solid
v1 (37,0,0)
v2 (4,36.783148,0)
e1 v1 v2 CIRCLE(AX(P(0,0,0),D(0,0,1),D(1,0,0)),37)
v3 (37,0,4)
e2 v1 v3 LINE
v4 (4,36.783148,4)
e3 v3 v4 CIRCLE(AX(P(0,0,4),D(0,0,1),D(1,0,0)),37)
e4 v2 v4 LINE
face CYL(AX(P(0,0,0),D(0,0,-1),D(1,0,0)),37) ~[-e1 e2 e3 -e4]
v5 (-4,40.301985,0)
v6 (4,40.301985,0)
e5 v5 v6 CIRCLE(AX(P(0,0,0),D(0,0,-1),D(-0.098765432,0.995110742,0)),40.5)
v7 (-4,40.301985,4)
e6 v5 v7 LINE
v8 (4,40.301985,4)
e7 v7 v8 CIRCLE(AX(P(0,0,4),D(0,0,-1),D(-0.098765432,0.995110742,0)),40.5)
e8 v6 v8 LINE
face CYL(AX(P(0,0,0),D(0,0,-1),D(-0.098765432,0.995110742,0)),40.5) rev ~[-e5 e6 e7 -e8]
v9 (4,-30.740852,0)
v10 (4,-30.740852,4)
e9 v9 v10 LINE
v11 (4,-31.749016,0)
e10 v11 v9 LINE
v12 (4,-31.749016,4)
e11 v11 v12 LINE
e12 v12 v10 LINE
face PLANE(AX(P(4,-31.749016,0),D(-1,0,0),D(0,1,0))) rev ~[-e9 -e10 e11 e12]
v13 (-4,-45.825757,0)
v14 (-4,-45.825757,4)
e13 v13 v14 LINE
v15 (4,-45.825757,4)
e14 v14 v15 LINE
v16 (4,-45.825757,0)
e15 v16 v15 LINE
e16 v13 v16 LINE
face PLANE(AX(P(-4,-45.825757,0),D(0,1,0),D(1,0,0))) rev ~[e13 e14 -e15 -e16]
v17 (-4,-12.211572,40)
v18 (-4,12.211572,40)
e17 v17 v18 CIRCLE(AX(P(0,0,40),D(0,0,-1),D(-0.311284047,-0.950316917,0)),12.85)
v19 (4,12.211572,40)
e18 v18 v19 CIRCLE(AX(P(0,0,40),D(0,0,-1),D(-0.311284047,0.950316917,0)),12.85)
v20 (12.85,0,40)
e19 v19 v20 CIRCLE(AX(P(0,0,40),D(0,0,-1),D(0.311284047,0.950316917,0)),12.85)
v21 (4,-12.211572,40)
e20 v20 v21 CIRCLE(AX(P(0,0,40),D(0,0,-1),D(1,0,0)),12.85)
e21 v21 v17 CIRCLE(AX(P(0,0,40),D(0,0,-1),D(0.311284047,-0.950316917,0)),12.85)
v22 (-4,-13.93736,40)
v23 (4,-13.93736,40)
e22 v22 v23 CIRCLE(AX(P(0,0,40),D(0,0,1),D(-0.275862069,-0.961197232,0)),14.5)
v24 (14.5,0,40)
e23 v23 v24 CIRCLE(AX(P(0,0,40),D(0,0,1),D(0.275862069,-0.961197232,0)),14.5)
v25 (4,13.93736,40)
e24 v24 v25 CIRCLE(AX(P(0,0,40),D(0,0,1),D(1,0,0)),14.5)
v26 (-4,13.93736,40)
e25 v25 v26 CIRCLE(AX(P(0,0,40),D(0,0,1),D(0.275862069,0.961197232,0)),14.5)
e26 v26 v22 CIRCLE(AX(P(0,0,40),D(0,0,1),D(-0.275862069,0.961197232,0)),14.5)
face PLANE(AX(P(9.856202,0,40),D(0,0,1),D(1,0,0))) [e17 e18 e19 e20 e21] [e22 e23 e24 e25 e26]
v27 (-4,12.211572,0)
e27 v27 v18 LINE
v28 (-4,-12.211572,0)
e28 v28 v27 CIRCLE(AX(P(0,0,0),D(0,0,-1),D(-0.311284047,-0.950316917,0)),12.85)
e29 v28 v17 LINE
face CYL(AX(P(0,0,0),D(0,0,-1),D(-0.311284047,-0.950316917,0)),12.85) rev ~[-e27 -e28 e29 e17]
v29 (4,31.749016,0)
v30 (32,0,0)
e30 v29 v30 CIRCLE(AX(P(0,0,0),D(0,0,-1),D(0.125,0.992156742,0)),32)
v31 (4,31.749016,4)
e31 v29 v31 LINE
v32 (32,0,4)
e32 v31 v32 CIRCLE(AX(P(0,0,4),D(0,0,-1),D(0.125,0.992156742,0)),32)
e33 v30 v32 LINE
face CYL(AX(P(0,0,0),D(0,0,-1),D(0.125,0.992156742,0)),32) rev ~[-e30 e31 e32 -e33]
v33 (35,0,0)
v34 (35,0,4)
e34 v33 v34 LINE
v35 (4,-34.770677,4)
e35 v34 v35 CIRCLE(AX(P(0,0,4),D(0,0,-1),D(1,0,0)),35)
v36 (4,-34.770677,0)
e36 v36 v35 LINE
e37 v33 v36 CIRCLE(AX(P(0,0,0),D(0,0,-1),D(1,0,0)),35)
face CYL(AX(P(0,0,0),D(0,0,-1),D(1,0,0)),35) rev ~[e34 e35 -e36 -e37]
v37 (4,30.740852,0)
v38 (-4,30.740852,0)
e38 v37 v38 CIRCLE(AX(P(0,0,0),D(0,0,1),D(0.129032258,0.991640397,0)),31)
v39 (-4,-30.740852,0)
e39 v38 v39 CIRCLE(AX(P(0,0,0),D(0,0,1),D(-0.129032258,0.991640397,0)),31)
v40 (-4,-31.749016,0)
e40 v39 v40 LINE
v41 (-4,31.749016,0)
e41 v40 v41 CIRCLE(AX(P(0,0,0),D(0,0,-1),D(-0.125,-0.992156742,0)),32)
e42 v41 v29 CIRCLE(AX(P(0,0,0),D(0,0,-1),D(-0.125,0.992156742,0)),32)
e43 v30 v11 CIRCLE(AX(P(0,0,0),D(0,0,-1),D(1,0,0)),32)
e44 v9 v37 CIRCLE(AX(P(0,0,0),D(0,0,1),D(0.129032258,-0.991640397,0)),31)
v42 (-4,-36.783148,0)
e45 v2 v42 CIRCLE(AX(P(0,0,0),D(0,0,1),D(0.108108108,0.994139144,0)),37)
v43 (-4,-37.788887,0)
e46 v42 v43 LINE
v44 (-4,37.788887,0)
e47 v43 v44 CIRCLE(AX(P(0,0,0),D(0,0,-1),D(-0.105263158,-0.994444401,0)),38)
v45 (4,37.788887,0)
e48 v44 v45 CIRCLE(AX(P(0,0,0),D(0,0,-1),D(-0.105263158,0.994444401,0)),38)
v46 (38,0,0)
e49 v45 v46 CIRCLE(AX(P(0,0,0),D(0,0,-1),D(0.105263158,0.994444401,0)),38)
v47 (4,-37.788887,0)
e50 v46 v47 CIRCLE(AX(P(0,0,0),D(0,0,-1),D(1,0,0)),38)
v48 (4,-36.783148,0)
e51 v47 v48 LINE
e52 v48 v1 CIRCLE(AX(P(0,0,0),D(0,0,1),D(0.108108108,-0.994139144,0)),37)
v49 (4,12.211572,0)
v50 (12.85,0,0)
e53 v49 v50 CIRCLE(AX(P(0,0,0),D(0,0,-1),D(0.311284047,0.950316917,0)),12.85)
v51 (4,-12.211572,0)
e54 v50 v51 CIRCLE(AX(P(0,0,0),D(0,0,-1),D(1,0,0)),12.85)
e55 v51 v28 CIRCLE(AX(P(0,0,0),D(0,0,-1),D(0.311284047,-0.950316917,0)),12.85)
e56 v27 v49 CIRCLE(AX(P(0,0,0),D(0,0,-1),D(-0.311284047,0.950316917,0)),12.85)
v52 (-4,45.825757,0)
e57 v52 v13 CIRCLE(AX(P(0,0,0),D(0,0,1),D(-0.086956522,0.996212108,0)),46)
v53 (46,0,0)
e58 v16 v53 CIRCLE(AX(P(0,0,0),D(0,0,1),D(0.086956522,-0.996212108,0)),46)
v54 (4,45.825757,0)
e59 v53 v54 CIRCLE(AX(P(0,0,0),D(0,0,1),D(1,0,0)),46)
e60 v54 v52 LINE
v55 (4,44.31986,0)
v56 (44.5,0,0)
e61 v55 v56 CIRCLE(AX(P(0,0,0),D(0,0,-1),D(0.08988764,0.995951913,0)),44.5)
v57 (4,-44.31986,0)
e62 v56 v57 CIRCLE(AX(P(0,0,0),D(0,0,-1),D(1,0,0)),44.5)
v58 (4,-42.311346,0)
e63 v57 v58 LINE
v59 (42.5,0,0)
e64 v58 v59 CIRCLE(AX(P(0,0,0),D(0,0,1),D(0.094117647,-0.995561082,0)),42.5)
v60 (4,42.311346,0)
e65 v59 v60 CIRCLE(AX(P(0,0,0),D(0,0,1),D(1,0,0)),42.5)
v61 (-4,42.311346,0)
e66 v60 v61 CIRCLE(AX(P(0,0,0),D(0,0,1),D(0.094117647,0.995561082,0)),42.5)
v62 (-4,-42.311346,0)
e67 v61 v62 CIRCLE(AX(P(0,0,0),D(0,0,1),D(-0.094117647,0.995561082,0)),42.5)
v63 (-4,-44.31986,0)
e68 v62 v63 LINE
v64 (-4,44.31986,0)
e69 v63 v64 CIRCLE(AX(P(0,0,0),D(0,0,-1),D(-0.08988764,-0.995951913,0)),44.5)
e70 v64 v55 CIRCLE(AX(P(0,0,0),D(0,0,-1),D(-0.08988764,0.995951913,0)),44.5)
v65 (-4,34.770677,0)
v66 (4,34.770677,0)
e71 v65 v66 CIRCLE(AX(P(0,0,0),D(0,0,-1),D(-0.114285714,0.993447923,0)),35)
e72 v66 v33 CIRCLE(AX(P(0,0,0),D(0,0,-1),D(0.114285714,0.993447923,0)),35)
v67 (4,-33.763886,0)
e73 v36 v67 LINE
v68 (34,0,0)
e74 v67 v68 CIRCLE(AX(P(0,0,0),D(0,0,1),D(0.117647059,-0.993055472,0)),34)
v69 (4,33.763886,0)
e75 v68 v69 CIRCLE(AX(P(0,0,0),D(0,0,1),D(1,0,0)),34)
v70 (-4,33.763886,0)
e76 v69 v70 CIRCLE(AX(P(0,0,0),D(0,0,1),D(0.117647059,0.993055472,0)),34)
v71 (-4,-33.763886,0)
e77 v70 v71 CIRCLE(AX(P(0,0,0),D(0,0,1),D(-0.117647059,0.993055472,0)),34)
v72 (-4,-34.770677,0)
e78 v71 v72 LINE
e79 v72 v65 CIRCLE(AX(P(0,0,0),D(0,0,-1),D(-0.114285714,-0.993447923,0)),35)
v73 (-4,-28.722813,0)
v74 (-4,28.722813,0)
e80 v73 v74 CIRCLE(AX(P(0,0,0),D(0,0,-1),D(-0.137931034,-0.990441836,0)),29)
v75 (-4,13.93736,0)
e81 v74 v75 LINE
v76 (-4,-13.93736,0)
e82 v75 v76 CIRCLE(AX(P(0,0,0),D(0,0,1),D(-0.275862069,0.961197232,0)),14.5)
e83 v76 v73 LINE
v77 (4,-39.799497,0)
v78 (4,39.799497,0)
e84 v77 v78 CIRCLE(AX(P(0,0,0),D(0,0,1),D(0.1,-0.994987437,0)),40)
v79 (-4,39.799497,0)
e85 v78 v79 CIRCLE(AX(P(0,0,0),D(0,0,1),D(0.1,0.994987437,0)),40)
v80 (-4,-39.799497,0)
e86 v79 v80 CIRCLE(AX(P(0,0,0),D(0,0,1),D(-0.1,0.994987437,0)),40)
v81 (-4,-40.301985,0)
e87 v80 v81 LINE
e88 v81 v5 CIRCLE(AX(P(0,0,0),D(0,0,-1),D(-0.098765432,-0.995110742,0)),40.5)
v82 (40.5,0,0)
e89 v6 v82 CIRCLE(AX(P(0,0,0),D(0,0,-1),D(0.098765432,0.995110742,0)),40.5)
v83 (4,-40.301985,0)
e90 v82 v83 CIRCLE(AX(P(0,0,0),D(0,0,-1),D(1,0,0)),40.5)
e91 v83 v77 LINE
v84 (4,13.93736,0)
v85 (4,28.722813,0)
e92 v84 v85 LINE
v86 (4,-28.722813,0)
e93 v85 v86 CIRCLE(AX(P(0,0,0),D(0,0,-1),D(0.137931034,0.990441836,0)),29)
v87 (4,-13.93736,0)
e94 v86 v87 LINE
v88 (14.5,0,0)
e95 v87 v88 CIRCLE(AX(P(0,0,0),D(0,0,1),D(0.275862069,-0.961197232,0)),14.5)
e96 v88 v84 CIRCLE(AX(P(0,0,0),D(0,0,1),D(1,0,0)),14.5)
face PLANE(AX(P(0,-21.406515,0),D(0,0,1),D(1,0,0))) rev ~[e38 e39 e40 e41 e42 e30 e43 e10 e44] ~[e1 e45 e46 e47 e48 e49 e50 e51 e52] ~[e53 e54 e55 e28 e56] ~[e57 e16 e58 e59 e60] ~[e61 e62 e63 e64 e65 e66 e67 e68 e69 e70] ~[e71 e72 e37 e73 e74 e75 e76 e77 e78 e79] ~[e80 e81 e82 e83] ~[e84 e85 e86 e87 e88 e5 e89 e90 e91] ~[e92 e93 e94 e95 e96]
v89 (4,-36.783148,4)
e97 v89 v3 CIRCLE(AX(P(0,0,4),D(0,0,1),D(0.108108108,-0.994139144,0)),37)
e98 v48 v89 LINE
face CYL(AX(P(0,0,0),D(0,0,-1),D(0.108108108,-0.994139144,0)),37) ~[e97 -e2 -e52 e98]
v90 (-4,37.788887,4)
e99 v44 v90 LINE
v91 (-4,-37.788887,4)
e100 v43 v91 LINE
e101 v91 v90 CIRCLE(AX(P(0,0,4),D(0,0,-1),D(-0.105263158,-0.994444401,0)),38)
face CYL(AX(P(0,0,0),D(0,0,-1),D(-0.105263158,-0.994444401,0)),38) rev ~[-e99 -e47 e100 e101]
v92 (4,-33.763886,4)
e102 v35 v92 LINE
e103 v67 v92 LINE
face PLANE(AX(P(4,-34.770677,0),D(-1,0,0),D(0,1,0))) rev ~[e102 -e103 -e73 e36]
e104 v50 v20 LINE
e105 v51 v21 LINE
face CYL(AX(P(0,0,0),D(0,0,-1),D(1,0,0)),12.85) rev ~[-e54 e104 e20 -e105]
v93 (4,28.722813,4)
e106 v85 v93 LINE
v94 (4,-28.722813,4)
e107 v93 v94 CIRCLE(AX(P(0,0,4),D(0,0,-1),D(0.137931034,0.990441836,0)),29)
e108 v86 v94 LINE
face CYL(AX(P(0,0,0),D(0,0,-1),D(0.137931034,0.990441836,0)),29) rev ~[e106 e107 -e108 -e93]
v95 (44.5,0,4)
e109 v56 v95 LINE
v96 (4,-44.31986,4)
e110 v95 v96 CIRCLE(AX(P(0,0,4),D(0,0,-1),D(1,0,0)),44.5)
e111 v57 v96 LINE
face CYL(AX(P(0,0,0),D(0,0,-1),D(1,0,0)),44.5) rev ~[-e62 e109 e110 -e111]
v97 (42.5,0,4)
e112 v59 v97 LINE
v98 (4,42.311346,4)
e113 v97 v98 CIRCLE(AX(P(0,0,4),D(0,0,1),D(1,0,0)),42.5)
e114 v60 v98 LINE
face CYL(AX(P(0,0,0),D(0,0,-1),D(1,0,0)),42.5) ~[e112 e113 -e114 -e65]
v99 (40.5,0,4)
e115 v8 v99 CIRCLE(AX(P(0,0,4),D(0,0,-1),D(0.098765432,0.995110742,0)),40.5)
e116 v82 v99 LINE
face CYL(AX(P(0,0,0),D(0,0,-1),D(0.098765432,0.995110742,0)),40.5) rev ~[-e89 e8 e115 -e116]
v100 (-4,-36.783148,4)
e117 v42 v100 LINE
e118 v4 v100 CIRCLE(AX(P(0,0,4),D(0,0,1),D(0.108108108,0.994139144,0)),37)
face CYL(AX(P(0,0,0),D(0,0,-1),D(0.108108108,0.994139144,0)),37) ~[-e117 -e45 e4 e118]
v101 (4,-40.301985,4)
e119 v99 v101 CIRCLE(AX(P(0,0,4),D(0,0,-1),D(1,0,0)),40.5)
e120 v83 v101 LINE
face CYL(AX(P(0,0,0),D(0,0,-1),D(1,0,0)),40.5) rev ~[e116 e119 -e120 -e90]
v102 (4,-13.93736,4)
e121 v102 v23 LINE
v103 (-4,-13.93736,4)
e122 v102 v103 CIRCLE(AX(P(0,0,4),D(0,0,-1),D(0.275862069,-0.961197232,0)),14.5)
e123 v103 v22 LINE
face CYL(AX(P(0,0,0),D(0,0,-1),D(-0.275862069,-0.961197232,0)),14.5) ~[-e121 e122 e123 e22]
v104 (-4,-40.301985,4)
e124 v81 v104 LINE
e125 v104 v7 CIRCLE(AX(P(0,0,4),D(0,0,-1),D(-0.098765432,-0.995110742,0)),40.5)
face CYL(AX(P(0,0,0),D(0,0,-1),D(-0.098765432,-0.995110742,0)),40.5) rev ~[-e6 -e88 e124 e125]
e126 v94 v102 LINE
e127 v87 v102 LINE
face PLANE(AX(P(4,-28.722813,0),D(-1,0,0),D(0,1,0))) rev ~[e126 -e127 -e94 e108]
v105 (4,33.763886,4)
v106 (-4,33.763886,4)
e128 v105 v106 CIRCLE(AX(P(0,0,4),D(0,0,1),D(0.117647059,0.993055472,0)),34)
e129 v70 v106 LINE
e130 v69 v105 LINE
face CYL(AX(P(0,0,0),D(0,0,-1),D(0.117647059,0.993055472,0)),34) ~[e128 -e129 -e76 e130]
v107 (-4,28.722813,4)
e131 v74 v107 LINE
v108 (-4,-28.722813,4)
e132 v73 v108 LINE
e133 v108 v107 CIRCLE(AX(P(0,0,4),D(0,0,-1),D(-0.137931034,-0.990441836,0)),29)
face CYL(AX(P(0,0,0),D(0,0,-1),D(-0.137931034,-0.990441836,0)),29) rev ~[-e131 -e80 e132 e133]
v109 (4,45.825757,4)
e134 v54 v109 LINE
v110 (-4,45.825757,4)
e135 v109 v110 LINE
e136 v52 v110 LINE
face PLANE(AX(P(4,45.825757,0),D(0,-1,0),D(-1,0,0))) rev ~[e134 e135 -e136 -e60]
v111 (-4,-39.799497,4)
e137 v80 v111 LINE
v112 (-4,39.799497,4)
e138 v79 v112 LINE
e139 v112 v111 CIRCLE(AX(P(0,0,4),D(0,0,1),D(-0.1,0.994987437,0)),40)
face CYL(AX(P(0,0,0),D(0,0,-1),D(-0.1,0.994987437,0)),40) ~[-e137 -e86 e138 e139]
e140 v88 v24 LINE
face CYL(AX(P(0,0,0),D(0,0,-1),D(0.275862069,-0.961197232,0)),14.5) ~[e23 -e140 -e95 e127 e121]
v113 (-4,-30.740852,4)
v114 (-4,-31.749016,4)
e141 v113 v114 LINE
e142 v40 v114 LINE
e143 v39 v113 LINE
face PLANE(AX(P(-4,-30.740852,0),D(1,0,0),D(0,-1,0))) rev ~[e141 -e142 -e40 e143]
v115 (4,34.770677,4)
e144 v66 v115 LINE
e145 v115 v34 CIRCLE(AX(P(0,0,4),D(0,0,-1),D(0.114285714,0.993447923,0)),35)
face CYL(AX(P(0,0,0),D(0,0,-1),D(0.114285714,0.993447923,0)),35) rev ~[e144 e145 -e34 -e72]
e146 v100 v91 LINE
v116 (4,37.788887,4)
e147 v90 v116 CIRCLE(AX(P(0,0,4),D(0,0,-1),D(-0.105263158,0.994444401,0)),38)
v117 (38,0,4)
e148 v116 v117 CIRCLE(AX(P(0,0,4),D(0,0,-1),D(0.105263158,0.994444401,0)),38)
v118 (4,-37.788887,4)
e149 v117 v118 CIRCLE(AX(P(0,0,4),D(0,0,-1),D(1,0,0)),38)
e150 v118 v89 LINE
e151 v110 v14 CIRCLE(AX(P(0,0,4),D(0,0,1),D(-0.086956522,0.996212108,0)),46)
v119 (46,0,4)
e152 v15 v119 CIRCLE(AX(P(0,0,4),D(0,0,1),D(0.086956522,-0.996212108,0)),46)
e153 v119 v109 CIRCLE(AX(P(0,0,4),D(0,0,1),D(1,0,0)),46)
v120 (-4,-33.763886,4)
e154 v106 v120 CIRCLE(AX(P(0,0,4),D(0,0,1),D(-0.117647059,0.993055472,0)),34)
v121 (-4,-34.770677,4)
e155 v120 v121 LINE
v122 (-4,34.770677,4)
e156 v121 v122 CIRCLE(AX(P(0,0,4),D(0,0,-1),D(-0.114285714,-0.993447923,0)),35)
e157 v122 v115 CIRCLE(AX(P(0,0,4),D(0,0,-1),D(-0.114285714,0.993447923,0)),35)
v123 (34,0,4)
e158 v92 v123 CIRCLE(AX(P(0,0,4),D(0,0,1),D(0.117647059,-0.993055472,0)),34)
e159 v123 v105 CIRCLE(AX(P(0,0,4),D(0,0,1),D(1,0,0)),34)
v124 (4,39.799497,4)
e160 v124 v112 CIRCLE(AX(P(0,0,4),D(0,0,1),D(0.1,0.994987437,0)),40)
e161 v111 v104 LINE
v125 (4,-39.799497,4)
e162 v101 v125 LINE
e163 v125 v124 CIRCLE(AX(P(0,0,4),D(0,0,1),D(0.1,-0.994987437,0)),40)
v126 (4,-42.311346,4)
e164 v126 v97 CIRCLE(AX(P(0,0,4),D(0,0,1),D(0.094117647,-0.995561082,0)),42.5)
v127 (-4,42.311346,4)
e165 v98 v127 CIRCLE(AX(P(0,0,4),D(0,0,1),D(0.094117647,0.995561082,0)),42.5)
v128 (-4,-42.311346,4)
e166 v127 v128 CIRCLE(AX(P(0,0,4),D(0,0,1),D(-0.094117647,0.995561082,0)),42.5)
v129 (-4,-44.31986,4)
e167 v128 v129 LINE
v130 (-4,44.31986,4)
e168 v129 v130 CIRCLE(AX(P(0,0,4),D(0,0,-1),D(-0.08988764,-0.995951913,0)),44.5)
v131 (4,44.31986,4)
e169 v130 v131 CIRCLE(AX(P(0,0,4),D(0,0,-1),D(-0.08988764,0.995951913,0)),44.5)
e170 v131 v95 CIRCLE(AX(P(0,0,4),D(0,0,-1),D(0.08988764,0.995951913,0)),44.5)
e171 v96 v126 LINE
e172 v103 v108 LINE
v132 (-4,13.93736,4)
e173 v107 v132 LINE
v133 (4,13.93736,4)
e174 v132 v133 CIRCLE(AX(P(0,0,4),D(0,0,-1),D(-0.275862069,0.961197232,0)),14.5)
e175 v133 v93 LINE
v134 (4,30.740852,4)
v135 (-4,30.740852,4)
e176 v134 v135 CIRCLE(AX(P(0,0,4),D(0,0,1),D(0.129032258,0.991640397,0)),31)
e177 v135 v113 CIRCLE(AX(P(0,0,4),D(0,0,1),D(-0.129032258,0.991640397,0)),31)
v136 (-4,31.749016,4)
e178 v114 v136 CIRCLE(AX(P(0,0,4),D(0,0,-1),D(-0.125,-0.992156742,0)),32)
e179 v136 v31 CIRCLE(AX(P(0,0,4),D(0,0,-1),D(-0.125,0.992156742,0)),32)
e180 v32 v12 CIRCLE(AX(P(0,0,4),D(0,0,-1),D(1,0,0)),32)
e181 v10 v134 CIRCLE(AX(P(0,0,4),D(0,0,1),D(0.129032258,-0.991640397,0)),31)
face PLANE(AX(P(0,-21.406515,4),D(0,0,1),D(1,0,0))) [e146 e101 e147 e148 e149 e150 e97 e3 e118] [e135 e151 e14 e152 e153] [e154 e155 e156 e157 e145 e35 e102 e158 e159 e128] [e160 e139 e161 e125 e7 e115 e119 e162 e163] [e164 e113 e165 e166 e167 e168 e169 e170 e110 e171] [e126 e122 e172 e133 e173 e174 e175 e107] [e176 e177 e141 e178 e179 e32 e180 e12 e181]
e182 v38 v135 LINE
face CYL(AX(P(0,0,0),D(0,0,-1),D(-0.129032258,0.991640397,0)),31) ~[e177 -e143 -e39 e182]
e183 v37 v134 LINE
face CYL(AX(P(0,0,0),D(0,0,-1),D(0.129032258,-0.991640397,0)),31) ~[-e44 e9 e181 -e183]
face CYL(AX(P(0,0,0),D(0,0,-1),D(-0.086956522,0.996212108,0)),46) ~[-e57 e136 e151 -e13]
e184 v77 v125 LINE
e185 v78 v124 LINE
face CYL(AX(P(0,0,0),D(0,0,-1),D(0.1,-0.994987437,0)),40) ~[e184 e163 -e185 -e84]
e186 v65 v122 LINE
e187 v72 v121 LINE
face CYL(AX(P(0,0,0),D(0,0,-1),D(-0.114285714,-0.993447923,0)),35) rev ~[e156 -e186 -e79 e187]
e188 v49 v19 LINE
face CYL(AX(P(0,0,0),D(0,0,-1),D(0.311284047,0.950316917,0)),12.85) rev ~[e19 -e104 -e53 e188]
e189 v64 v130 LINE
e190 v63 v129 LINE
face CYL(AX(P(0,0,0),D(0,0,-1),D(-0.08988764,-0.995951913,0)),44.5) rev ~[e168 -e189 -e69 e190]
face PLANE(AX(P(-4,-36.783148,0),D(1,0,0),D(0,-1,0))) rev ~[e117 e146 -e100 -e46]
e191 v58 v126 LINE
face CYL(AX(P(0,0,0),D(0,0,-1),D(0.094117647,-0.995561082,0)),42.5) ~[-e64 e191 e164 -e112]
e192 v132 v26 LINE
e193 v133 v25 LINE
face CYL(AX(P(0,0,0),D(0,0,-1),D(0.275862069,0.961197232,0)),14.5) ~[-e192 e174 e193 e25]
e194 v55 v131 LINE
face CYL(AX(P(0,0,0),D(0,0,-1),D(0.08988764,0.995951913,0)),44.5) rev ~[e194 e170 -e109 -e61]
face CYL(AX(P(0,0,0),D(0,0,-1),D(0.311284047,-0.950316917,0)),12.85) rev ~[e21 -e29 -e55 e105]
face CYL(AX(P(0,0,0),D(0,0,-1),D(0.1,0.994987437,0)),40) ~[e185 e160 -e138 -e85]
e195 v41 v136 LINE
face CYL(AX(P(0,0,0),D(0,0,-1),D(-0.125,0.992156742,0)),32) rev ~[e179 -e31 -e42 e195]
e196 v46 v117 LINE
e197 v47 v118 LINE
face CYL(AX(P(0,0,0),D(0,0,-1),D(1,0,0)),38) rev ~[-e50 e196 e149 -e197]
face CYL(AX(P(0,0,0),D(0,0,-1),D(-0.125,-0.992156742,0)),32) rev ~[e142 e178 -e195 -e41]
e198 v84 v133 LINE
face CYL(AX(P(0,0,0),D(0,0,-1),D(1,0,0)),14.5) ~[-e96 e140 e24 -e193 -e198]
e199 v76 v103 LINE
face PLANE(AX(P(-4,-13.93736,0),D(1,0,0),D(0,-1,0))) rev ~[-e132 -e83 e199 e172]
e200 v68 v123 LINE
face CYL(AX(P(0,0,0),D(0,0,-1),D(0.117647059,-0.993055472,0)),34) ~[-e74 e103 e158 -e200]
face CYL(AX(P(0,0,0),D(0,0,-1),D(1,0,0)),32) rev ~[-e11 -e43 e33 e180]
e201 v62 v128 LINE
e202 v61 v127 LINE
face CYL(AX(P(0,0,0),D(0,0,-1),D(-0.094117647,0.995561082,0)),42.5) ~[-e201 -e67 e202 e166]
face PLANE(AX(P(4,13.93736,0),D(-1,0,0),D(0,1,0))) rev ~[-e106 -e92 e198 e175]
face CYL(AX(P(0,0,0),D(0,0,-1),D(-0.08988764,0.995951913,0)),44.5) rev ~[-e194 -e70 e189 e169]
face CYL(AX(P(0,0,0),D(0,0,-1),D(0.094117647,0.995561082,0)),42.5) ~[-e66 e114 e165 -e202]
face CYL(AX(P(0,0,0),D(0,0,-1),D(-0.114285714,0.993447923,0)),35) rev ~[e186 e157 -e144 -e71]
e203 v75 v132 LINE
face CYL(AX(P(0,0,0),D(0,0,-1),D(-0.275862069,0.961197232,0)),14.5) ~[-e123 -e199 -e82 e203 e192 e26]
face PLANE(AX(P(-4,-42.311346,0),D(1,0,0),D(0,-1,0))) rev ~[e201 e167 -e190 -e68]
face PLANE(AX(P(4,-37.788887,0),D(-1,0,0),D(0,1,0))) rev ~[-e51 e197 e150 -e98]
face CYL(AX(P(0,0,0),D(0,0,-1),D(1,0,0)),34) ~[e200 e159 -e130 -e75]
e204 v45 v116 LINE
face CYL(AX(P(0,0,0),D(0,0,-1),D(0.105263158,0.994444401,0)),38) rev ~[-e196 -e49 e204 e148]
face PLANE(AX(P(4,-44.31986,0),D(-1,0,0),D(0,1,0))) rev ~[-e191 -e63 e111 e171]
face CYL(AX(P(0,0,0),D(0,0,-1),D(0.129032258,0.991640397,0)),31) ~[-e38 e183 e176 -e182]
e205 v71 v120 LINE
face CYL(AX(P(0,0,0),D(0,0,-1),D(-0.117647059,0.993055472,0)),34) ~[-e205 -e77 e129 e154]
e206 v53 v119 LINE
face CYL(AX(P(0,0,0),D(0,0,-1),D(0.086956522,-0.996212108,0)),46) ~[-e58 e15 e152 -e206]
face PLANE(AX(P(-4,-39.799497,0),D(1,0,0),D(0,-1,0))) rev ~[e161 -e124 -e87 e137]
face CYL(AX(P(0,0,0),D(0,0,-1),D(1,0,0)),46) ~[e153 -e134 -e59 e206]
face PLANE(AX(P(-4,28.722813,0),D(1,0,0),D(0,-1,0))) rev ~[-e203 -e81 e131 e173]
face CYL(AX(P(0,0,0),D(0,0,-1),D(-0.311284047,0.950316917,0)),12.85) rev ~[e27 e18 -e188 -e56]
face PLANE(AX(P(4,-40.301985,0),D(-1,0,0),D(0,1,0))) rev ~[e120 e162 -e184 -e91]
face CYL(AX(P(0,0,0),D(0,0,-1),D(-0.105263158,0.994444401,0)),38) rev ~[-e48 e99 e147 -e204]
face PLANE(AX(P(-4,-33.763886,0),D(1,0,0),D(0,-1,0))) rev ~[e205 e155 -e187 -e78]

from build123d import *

# Parameters (mm, degrees)
F1_DEPTH = 40
F2_DEPTH = 4


with BuildPart() as f1:
    # F0 (on Top) → F1 (new body)
    with BuildSketch(Plane.XY):
        with BuildLine():
            ThreePointArc((4, 12.2115723803), (10.4048666498, 7.5406398933), (12.85, 0))
            ThreePointArc((12.85, 0), (10.4048666498, -7.5406398933), (4, -12.2115723803))
            Line((4, -12.2115723803), (4, -13.9373598648))
            ThreePointArc((4, -13.9373598648), (11.5812348219, -8.7249641833), (14.5, 0))
            ThreePointArc((14.5, 0), (11.5812348219, 8.7249641833), (4, 13.9373598648))
            Line((4, 13.9373598648), (4, 12.2115723803))
        make_face()
        with BuildLine():
            ThreePointArc((-4, 12.2115723803), (0, 12.85), (4, 12.2115723803))
            Line((4, 12.2115723803), (4, 13.9373598648))
            ThreePointArc((4, 13.9373598648), (0, 14.5), (-4, 13.9373598648))
            Line((-4, 13.9373598648), (-4, 12.2115723803))
        make_face()
        with BuildLine():
            Line((4, -13.9373598648), (4, -12.2115723803))
            ThreePointArc((4, -12.2115723803), (0, -12.85), (-4, -12.2115723803))
            Line((-4, -12.2115723803), (-4, -13.9373598648))
            ThreePointArc((-4, -13.9373598648), (0, -14.5), (4, -13.9373598648))
        make_face()
        with BuildLine():
            ThreePointArc((-4, -12.2115723803), (-12.85, 0), (-4, 12.2115723803))
            Line((-4, 12.2115723803), (-4, 13.9373598648))
            ThreePointArc((-4, 13.9373598648), (-14.5, 0), (-4, -13.9373598648))
            Line((-4, -13.9373598648), (-4, -12.2115723803))
        make_face()
    extrude(amount=F1_DEPTH)

    # F0 (on Top) → F2 (join)
    with BuildSketch(Plane.XY):
        with BuildLine():
            Line((4, -28.7228132327), (4, -13.9373598648))
            ThreePointArc((4, -13.9373598648), (0, -14.5), (-4, -13.9373598648))
            Line((-4, -13.9373598648), (-4, -28.7228132327))
            ThreePointArc((-4, -28.7228132327), (0, -29), (4, -28.7228132327))
        make_face()
        with BuildLine():
            ThreePointArc((-4, 40.3019850628), (0, 40.5), (4, 40.3019850628))
            Line((4, 40.3019850628), (4, 42.3113459961))
            ThreePointArc((4, 42.3113459961), (0, 42.5), (-4, 42.3113459961))
            Line((-4, 42.3113459961), (-4, 40.3019850628))
        make_face()
        with BuildLine():
            ThreePointArc((-4, -40.3019850628), (-40.5, 0), (-4, 40.3019850628))
            Line((-4, 40.3019850628), (-4, 42.3113459961))
            ThreePointArc((-4, 42.3113459961), (-42.5, 0), (-4, -42.3113459961))
            Line((-4, -42.3113459961), (-4, -40.3019850628))
        make_face()
        with BuildLine():
            Line((4, -42.3113459961), (4, -40.3019850628))
            ThreePointArc((4, -40.3019850628), (0, -40.5), (-4, -40.3019850628))
            Line((-4, -40.3019850628), (-4, -42.3113459961))
            ThreePointArc((-4, -42.3113459961), (0, -42.5), (4, -42.3113459961))
        make_face()
        with BuildLine():
            Line((4, 42.3113459961), (4, 40.3019850628))
            ThreePointArc((4, 40.3019850628), (30.0187441443, 27.1868534406), (40.5, 0))
            ThreePointArc((40.5, 0), (30.0187441443, -27.1868534406), (4, -40.3019850628))
            Line((4, -40.3019850628), (4, -42.3113459961))
            ThreePointArc((4, -42.3113459961), (31.434455618, -28.6028844699), (42.5, 0))
            ThreePointArc((42.5, 0), (31.434455618, 28.6028844699), (4, 42.3113459961))
        make_face()
        with BuildLine():
            ThreePointArc((-4, 37.7888872554), (0, 38), (4, 37.7888872554))
            Line((4, 37.7888872554), (4, 39.7994974843))
            ThreePointArc((4, 39.7994974843), (0, 40), (-4, 39.7994974843))
            Line((-4, 39.7994974843), (-4, 37.7888872554))
        make_face()
        with BuildLine():
            ThreePointArc((-4, -37.7888872554), (-38, 0), (-4, 37.7888872554))
            Line((-4, 37.7888872554), (-4, 39.7994974843))
            ThreePointArc((-4, 39.7994974843), (-40, 0), (-4, -39.7994974843))
            Line((-4, -39.7994974843), (-4, -37.7888872554))
        make_face()
        with BuildLine():
            Line((4, -39.7994974843), (4, -37.7888872554))
            ThreePointArc((4, -37.7888872554), (0, -38), (-4, -37.7888872554))
            Line((-4, -37.7888872554), (-4, -39.7994974843))
            ThreePointArc((-4, -39.7994974843), (0, -40), (4, -39.7994974843))
        make_face()
        with BuildLine():
            Line((4, 39.7994974843), (4, 37.7888872554))
            ThreePointArc((4, 37.7888872554), (28.2488937837, 25.4165300543), (38, 0))
            ThreePointArc((38, 0), (28.2488937837, -25.4165300543), (4, -37.7888872554))
            Line((4, -37.7888872554), (4, -39.7994974843))
            ThreePointArc((4, -39.7994974843), (29.6647939484, -26.83281573), (40, 0))
            ThreePointArc((40, 0), (29.6647939484, 26.83281573), (4, 39.7994974843))
        make_face()
        with BuildLine():
            Line((4, -40.3019850628), (4, -39.7994974843))
            ThreePointArc((4, -39.7994974843), (0, -40), (-4, -39.7994974843))
            Line((-4, -39.7994974843), (-4, -40.3019850628))
            ThreePointArc((-4, -40.3019850628), (0, -40.5), (4, -40.3019850628))
        make_face()
        with BuildLine():
            Line((4, -44.3198601081), (4, -42.3113459961))
            ThreePointArc((4, -42.3113459961), (0, -42.5), (-4, -42.3113459961))
            Line((-4, -42.3113459961), (-4, -44.3198601081))
            ThreePointArc((-4, -44.3198601081), (0, -44.5), (4, -44.3198601081))
        make_face()
        with BuildLine():
            ThreePointArc((-4, -44.3198601081), (-44.5, 0), (-4, 44.3198601081))
            Line((-4, 44.3198601081), (-4, 45.8257569496))
            ThreePointArc((-4, 45.8257569496), (-46, 0), (-4, -45.8257569496))
            Line((-4, -45.8257569496), (-4, -44.3198601081))
        make_face()
        with BuildLine():
            Line((4, 45.8257569496), (4, 44.3198601081))
            ThreePointArc((4, 44.3198601081), (32.8500380517, 30.0187441443), (44.5, 0))
            ThreePointArc((44.5, 0), (32.8500380517, -30.0187441443), (4, -44.3198601081))
            Line((4, -44.3198601081), (4, -45.8257569496))
            ThreePointArc((4, -45.8257569496), (33.9116499156, -31.0805405358), (46, 0))
            ThreePointArc((46, 0), (33.9116499156, 31.0805405358), (4, 45.8257569496))
        make_face()
        with BuildLine():
            ThreePointArc((-4, 44.3198601081), (0, 44.5), (4, 44.3198601081))
            Line((4, 44.3198601081), (4, 45.8257569496))
            Line((4, 45.8257569496), (-4, 45.8257569496))
            Line((-4, 45.8257569496), (-4, 44.3198601081))
        make_face()
        with BuildLine():
            Line((4, -45.8257569496), (4, -44.3198601081))
            ThreePointArc((4, -44.3198601081), (0, -44.5), (-4, -44.3198601081))
            Line((-4, -44.3198601081), (-4, -45.8257569496))
            Line((-4, -45.8257569496), (4, -45.8257569496))
        make_face()
        with BuildLine():
            ThreePointArc((-4, -34.7706773014), (-35, 0), (-4, 34.7706773014))
            Line((-4, 34.7706773014), (-4, 36.7831483155))
            ThreePointArc((-4, 36.7831483155), (-37, 0), (-4, -36.7831483155))
            Line((-4, -36.7831483155), (-4, -34.7706773014))
        make_face()
        with BuildLine():
            ThreePointArc((-4, -31.7490157328), (-32, 0), (-4, 31.7490157328))
            Line((-4, 31.7490157328), (-4, 33.7638860323))
            ThreePointArc((-4, 33.7638860323), (-34, 0), (-4, -33.7638860323))
            Line((-4, -33.7638860323), (-4, -31.7490157328))
        make_face()
        with BuildLine():
            ThreePointArc((-4, -28.7228132327), (-29, 0), (-4, 28.7228132327))
            Line((-4, 28.7228132327), (-4, 30.7408522979))
            ThreePointArc((-4, 30.7408522979), (-31, 0), (-4, -30.7408522979))
            Line((-4, -30.7408522979), (-4, -28.7228132327))
        make_face()
        with BuildLine():
            Line((4, 36.7831483155), (4, 34.7706773014))
            ThreePointArc((4, 34.7706773014), (26.1247009552, 23.2916293977), (35, 0))
            ThreePointArc((35, 0), (26.1247009552, -23.2916293977), (4, -34.7706773014))
            Line((4, -34.7706773014), (4, -36.7831483155))
            ThreePointArc((4, -36.7831483155), (27.5408787078, -24.7082982012), (37, 0))
            ThreePointArc((37, 0), (27.5408787078, 24.7082982012), (4, 36.7831483155))
        make_face()
        with BuildLine():
            Line((4, 33.7638860323), (4, 31.7490157328))
            ThreePointArc((4, 31.7490157328), (24, 21.1660104885), (32, 0))
            ThreePointArc((32, 0), (24, -21.1660104885), (4, -31.7490157328))
            Line((4, -31.7490157328), (4, -33.7638860323))
            ThreePointArc((4, -33.7638860323), (25.4165300543, -22.5831795813), (34, 0))
            ThreePointArc((34, 0), (25.4165300543, 22.5831795813), (4, 33.7638860323))
        make_face()
        with BuildLine():
            Line((4, 30.7408522979), (4, 28.7228132327))
            ThreePointArc((4, 28.7228132327), (21.8746428542, 19.0394327647), (29, 0))
            ThreePointArc((29, 0), (21.8746428542, -19.0394327647), (4, -28.7228132327))
            Line((4, -28.7228132327), (4, -30.7408522979))
            ThreePointArc((4, -30.7408522979), (23.2916293977, -20.4572725455), (31, 0))
            ThreePointArc((31, 0), (23.2916293977, 20.4572725455), (4, 30.7408522979))
        make_face()
        with BuildLine():
            ThreePointArc((-4, 28.7228132327), (0, 29), (4, 28.7228132327))
            Line((4, 28.7228132327), (4, 30.7408522979))
            ThreePointArc((4, 30.7408522979), (0, 31), (-4, 30.7408522979))
            Line((-4, 30.7408522979), (-4, 28.7228132327))
        make_face()
        with BuildLine():
            ThreePointArc((-4, 31.7490157328), (0, 32), (4, 31.7490157328))
            Line((4, 31.7490157328), (4, 33.7638860323))
            ThreePointArc((4, 33.7638860323), (0, 34), (-4, 33.7638860323))
            Line((-4, 33.7638860323), (-4, 31.7490157328))
        make_face()
        with BuildLine():
            ThreePointArc((-4, 34.7706773014), (0, 35), (4, 34.7706773014))
            Line((4, 34.7706773014), (4, 36.7831483155))
            ThreePointArc((4, 36.7831483155), (0, 37), (-4, 36.7831483155))
            Line((-4, 36.7831483155), (-4, 34.7706773014))
        make_face()
        with BuildLine():
            Line((4, -30.7408522979), (4, -28.7228132327))
            ThreePointArc((4, -28.7228132327), (0, -29), (-4, -28.7228132327))
            Line((-4, -28.7228132327), (-4, -30.7408522979))
            ThreePointArc((-4, -30.7408522979), (0, -31), (4, -30.7408522979))
        make_face()
        with BuildLine():
            Line((4, -33.7638860323), (4, -31.7490157328))
            ThreePointArc((4, -31.7490157328), (0, -32), (-4, -31.7490157328))
            Line((-4, -31.7490157328), (-4, -33.7638860323))
            ThreePointArc((-4, -33.7638860323), (0, -34), (4, -33.7638860323))
        make_face()
        with BuildLine():
            Line((4, -36.7831483155), (4, -34.7706773014))
            ThreePointArc((4, -34.7706773014), (0, -35), (-4, -34.7706773014))
            Line((-4, -34.7706773014), (-4, -36.7831483155))
            ThreePointArc((-4, -36.7831483155), (0, -37), (4, -36.7831483155))
        make_face()
        with BuildLine():
            Line((4, -31.7490157328), (4, -30.7408522979))
            ThreePointArc((4, -30.7408522979), (0, -31), (-4, -30.7408522979))
            Line((-4, -30.7408522979), (-4, -31.7490157328))
            ThreePointArc((-4, -31.7490157328), (0, -32), (4, -31.7490157328))
        make_face()
        with BuildLine():
            Line((4, -34.7706773014), (4, -33.7638860323))
            ThreePointArc((4, -33.7638860323), (0, -34), (-4, -33.7638860323))
            Line((-4, -33.7638860323), (-4, -34.7706773014))
            ThreePointArc((-4, -34.7706773014), (0, -35), (4, -34.7706773014))
        make_face()
        with BuildLine():
            Line((4, -37.7888872554), (4, -36.7831483155))
            ThreePointArc((4, -36.7831483155), (0, -37), (-4, -36.7831483155))
            Line((-4, -36.7831483155), (-4, -37.7888872554))
            ThreePointArc((-4, -37.7888872554), (0, -38), (4, -37.7888872554))
        make_face()
        with BuildLine():
            ThreePointArc((-4, 13.9373598648), (0, 14.5), (4, 13.9373598648))
            Line((4, 13.9373598648), (4, 28.7228132327))
            ThreePointArc((4, 28.7228132327), (0, 29), (-4, 28.7228132327))
            Line((-4, 28.7228132327), (-4, 13.9373598648))
        make_face()
    extrude(amount=F2_DEPTH)


solid = f1.part
